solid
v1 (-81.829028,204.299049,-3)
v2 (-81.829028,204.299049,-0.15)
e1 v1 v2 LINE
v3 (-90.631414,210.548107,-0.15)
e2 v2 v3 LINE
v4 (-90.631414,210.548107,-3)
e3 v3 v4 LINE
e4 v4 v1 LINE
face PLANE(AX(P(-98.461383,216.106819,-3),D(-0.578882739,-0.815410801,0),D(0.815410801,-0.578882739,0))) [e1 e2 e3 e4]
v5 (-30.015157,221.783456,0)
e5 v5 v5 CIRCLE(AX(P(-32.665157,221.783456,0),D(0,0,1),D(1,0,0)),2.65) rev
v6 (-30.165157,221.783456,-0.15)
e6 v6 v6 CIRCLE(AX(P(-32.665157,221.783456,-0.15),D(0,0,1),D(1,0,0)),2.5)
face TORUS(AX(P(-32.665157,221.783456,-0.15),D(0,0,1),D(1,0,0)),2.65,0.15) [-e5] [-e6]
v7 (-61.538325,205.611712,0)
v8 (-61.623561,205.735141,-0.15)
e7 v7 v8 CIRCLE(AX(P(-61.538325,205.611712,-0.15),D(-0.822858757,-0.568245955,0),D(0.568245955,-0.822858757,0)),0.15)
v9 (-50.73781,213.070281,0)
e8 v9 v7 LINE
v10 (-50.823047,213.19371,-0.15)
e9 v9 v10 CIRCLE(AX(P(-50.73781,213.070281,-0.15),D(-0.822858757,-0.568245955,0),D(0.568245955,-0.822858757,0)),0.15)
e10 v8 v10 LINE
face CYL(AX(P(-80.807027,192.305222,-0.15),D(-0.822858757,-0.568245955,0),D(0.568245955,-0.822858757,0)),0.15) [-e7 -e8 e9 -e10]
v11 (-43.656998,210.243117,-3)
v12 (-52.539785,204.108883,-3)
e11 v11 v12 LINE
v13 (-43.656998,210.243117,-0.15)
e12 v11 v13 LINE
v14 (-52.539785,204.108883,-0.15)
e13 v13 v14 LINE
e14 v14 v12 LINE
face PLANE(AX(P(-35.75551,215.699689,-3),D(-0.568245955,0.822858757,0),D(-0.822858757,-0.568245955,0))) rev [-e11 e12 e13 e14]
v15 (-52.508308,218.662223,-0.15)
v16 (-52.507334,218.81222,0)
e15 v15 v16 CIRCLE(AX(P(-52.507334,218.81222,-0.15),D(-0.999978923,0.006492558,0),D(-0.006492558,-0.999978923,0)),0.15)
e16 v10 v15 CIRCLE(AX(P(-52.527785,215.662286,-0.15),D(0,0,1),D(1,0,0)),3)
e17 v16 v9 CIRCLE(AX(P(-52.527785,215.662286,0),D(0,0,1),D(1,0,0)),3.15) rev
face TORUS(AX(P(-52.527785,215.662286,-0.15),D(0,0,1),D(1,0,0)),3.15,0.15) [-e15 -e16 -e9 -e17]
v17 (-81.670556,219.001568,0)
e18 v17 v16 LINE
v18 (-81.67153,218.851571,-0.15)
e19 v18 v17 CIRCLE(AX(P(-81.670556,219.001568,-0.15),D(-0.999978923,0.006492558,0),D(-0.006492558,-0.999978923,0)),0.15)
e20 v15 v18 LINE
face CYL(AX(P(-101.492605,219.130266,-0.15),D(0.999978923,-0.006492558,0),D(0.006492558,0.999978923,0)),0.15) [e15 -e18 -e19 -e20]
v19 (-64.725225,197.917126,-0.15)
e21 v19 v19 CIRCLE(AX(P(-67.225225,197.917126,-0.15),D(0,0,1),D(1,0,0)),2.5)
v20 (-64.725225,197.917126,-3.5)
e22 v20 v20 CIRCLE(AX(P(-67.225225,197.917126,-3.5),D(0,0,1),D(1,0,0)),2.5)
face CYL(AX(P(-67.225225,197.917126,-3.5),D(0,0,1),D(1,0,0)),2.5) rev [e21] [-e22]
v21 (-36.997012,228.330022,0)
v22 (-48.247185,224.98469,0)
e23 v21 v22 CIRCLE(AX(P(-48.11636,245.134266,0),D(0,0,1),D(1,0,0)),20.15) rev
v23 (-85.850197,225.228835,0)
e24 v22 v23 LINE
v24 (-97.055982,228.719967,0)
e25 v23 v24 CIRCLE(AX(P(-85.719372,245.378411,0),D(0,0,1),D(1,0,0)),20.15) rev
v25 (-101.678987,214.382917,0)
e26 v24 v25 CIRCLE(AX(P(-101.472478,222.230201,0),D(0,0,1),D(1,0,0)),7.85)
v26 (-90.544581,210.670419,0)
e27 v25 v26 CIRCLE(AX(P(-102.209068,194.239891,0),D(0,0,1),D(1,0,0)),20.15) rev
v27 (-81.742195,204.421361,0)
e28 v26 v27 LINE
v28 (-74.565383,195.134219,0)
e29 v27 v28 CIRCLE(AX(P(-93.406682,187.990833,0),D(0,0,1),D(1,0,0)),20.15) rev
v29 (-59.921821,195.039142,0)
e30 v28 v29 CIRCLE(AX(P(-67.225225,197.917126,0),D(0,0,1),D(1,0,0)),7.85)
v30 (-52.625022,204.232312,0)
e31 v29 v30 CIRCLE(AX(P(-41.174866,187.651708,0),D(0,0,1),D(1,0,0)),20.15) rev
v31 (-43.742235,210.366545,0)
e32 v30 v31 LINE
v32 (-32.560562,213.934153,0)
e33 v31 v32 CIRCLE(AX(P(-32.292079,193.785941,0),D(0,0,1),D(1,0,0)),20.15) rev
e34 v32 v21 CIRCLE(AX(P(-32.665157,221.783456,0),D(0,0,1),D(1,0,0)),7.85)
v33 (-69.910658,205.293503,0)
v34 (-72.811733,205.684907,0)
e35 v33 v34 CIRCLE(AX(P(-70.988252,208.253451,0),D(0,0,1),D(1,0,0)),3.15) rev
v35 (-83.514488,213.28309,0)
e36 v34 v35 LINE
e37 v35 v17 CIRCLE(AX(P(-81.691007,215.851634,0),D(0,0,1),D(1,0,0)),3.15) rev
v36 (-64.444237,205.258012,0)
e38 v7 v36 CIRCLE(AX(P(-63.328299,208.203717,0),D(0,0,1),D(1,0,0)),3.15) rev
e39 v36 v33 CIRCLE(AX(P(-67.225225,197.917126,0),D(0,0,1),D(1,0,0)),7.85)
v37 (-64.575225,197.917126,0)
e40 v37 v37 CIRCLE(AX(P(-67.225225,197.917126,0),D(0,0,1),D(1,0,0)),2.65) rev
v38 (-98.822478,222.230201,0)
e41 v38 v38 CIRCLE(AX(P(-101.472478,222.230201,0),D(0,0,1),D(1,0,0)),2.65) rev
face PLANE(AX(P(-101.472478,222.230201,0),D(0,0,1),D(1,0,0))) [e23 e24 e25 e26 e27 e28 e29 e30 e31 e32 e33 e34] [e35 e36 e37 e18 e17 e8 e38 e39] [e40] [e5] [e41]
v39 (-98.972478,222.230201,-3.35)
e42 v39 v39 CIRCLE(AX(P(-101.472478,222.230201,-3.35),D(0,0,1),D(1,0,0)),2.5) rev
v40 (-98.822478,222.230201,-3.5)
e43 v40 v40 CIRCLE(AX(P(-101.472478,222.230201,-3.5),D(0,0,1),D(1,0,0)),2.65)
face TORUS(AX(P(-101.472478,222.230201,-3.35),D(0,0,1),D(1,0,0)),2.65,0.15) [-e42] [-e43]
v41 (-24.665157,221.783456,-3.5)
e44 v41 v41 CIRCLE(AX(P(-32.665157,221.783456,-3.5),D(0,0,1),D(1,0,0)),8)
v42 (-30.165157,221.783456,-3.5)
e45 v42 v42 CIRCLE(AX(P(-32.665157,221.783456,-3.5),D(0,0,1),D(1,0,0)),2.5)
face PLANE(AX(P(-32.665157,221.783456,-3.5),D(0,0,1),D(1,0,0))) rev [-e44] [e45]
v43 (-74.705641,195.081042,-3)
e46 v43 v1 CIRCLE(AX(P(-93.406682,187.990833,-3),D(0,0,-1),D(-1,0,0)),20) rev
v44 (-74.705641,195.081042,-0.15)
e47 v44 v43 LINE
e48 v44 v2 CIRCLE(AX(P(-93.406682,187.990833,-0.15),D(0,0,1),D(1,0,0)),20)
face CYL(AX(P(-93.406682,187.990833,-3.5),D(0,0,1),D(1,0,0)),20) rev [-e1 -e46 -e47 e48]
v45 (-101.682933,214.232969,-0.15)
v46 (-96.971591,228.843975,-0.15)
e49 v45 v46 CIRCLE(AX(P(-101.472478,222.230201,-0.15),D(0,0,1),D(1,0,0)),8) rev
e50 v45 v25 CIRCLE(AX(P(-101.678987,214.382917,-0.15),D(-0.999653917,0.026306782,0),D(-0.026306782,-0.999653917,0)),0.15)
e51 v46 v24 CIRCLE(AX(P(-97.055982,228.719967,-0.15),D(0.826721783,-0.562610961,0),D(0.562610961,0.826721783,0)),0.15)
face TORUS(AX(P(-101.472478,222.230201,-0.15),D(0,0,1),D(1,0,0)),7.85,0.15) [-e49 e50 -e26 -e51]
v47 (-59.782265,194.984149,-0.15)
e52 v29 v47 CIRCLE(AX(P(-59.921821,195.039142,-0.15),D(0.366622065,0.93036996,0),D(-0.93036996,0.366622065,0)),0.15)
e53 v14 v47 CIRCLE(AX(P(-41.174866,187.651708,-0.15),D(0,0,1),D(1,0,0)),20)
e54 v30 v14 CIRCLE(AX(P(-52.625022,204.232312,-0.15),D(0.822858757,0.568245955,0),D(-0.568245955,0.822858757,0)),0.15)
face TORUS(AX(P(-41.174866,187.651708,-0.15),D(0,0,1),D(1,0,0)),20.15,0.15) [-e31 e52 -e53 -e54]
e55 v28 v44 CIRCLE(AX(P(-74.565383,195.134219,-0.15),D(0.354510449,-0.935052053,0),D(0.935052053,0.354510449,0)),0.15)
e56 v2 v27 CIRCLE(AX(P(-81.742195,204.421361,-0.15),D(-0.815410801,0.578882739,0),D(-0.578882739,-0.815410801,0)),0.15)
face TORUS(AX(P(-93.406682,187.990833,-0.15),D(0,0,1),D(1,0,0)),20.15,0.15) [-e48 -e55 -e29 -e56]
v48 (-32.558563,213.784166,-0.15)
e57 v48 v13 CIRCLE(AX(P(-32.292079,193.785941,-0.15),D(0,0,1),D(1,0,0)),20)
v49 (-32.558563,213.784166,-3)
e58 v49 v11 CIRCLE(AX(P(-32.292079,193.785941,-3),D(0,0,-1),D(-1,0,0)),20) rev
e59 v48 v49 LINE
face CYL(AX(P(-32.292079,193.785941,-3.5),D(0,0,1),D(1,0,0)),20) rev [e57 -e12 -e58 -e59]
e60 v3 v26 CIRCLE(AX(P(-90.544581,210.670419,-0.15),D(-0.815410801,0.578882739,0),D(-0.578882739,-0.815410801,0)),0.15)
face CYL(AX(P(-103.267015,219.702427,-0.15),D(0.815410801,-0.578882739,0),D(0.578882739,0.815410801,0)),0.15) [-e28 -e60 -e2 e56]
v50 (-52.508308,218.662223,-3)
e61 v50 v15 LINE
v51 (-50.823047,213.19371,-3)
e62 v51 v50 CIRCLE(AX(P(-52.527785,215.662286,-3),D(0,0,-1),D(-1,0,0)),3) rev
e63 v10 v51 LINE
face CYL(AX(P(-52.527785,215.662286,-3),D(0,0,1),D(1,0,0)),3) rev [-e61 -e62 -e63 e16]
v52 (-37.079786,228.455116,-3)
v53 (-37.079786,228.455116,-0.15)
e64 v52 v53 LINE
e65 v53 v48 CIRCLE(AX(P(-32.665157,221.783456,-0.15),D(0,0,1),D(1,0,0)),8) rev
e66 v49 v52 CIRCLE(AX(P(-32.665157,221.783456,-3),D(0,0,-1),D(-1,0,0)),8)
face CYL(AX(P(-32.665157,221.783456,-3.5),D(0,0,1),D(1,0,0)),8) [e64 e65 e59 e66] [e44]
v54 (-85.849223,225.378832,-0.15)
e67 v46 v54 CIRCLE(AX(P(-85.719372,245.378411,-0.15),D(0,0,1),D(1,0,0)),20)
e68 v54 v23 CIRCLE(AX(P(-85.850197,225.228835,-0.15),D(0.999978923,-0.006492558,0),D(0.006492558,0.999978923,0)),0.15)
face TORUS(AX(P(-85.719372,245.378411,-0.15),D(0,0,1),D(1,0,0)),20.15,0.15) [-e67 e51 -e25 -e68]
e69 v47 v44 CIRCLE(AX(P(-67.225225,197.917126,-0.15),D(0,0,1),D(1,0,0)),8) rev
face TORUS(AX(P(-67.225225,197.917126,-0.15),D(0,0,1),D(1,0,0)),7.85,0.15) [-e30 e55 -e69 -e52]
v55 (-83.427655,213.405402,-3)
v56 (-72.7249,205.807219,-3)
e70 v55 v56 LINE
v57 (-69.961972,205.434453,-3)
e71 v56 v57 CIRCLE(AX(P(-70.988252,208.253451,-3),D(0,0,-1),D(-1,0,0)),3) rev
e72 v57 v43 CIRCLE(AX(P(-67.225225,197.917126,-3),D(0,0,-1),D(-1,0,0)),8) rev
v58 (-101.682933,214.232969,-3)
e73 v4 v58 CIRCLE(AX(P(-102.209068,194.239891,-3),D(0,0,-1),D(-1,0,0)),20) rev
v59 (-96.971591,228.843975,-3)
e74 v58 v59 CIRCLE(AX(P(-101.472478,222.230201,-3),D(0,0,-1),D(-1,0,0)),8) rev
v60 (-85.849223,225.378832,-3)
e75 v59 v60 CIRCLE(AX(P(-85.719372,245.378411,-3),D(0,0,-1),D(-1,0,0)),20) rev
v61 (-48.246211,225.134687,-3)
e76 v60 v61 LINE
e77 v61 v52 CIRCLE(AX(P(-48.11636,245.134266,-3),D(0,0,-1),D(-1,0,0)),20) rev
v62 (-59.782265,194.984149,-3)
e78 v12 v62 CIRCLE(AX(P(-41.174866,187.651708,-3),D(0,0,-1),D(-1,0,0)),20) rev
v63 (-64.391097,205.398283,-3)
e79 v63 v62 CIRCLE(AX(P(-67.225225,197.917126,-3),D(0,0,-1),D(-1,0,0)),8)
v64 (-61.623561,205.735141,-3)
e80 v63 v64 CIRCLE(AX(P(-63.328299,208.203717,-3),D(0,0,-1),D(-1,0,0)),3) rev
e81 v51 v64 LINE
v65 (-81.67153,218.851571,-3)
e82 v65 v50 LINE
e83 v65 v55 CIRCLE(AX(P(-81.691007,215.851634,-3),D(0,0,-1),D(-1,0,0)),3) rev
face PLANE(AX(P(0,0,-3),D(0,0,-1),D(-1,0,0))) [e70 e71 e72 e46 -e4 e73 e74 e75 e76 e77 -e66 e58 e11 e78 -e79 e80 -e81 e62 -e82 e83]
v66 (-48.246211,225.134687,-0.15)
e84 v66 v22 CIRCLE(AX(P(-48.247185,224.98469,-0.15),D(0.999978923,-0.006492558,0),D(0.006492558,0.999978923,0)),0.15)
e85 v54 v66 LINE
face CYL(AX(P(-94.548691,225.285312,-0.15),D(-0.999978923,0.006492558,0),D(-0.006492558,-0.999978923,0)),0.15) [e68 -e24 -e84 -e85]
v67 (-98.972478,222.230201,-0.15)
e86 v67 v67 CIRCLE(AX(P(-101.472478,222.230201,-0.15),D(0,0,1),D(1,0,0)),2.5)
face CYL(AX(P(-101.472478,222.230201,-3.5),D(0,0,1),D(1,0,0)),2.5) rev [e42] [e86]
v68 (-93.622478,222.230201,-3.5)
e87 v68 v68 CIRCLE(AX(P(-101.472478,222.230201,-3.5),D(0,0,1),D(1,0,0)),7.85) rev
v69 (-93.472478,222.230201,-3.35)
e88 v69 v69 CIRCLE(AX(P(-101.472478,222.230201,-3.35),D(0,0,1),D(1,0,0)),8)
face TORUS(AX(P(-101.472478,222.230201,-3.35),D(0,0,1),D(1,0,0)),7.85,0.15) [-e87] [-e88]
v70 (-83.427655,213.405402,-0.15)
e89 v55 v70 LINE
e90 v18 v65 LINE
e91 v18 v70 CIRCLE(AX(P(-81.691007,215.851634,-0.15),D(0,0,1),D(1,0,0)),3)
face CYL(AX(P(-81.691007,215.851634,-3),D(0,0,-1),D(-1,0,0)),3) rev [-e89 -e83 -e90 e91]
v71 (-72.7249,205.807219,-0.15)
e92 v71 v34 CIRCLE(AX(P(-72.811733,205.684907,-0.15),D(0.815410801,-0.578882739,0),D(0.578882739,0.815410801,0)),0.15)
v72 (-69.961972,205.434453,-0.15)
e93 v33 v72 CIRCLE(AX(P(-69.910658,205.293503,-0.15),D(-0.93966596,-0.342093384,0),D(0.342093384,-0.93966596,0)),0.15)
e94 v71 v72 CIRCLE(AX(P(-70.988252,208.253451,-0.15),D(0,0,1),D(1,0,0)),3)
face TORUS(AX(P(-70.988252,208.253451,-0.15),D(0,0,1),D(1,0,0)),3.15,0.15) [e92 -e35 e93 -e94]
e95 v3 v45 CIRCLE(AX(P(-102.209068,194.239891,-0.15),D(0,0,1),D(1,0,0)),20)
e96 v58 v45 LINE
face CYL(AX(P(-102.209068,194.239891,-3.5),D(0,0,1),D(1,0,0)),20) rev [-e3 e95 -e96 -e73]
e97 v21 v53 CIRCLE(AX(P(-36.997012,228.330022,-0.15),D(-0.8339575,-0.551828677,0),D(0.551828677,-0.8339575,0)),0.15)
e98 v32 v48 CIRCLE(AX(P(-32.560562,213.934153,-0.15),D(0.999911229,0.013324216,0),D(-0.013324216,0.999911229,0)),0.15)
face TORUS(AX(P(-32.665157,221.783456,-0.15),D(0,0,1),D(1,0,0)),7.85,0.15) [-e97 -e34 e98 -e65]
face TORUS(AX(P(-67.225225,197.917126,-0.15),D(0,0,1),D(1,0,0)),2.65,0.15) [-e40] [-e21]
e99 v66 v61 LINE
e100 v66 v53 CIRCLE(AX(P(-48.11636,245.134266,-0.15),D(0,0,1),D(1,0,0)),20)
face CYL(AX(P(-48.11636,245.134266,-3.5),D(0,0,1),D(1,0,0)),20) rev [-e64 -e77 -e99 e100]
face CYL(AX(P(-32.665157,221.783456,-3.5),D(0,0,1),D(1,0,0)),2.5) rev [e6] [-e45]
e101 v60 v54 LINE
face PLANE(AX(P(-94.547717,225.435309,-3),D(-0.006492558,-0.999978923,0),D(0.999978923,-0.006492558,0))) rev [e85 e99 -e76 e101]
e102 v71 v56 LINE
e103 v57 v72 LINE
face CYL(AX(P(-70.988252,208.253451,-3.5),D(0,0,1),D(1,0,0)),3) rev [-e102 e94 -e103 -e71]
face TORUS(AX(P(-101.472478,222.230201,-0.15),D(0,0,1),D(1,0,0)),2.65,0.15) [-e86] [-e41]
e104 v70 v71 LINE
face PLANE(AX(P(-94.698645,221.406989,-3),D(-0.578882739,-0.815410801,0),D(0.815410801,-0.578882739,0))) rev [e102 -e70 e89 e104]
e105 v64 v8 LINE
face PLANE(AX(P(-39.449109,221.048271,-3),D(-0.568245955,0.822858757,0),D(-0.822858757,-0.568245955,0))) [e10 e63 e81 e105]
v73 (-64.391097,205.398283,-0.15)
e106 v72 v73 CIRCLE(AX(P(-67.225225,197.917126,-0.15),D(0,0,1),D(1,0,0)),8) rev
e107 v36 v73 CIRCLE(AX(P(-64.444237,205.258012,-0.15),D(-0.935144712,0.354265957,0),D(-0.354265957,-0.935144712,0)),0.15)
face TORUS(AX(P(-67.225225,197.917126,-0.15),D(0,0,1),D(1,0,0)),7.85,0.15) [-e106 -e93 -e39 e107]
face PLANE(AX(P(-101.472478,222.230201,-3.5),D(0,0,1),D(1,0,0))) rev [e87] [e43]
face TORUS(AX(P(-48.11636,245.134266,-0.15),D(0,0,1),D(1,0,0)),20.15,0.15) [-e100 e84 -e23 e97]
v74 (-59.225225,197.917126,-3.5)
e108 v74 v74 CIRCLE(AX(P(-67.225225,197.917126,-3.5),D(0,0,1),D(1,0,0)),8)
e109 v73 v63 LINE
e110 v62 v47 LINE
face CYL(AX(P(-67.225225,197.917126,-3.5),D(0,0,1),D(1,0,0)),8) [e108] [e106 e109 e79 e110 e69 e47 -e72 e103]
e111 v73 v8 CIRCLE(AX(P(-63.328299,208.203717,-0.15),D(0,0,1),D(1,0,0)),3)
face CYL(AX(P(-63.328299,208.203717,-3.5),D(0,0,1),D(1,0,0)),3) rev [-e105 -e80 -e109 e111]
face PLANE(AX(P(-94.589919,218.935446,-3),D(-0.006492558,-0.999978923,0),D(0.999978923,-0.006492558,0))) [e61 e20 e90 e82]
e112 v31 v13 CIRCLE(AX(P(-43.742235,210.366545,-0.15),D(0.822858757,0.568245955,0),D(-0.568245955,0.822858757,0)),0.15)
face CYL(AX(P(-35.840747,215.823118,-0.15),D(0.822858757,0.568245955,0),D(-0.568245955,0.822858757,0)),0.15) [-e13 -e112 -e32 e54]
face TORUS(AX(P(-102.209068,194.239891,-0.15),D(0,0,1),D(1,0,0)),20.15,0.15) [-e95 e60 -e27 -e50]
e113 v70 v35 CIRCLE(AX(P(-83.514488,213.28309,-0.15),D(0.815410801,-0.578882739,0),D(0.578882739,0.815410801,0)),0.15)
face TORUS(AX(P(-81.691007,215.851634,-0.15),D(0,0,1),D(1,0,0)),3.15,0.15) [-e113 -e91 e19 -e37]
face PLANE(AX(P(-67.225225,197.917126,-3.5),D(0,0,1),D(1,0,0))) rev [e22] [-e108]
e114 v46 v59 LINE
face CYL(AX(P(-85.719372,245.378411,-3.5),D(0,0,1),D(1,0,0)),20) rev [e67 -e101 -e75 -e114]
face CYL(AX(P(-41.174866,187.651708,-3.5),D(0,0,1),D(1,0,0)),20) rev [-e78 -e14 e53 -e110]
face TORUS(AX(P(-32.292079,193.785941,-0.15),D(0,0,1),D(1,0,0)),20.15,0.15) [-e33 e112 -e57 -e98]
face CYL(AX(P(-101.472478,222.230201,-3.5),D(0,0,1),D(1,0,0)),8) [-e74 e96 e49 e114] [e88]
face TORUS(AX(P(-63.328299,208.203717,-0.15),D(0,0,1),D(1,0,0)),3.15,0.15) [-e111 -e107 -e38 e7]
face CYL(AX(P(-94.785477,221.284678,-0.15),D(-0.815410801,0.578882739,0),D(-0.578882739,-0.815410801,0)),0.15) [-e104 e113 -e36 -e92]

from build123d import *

# Parameters (mm, degrees)
SKETCH_1_R        = 8
SKETCH_1_R_2      = 2.5
EXTRUDE_1_DEPTH   = 3.5
EXTRUDE_1_2_DEPTH = 3.5
EXTRUDE_1_3_DEPTH = 3.5
EXTRUDE_1_4_DEPTH = 3
FILLET_1_R        = 3
FILLET_2_R        = 20
FILLET_3_R        = 0.15


with BuildPart() as part:
    # 草图1 → Extrude 1 (new body)
    with BuildSketch(Plane.XY):
        with Locations((-101.472478495, 222.230200701)):
            Circle(SKETCH_1_R)
        with Locations((-101.472478495, 222.230200701)):
            Circle(SKETCH_1_R_2, mode=Mode.SUBTRACT)
    extrude(amount=-EXTRUDE_1_DEPTH)



with BuildPart() as body_2:
    # 草图1 → Extrude 1 2 (new body)
    with BuildSketch(Plane.XY):
        with Locations((-32.665157049, 221.783455762)):
            Circle(SKETCH_1_R)
        with Locations((-32.665157049, 221.783455762)):
            Circle(SKETCH_1_R_2, mode=Mode.SUBTRACT)
    extrude(amount=-EXTRUDE_1_2_DEPTH)


with BuildPart() as body_3:
    # 草图1 → Extrude 1 3 (new body)
    with BuildSketch(Plane.XY):
        with Locations((-67.225224859, 197.917125651)):
            Circle(SKETCH_1_R)
        with Locations((-67.225224859, 197.917125651)):
            Circle(SKETCH_1_R_2, mode=Mode.SUBTRACT)
    extrude(amount=-EXTRUDE_1_3_DEPTH)


with BuildPart() as part_1:
    add(part.part)

    add(body_2.part)  # Extrude 1 4 merges body 2

    add(body_3.part)  # Extrude 1 4 merges body 3
    # 草图2 → Extrude 1 4 (add)
    with BuildSketch(Plane.XY):
        Polygon((-94.589918585, 218.935445838), (-39.589918585, 218.578347624), (-39.547716959, 225.078210624), (-94.547716959, 225.435308839), align=None)
        Polygon((-39.449108947, 221.048270993), (-64.134871668, 204.000892343), (-60.441272961, 198.65231042), (-35.755510239, 215.69968907), align=None)
        Polygon((-98.461382592, 216.106819162), (-73.999058567, 198.740336984), (-70.236320761, 204.040507189), (-94.698644787, 221.406989368), align=None)
    extrude(amount=-EXTRUDE_1_4_DEPTH)

    # 圆角1
    fillet_1_edges = [part_1.edges().sort_by_distance(p)[0] for p in [
        (-42.993723716, 218.600447492, -1.5),
        (-63.0568479, 204.745348958, -1.5),
        (-71.304586993, 204.798899011, -1.5),
        (-91.186113454, 218.91334597, -1.5),
    ]]
    fillet(fillet_1_edges, radius=FILLET_1_R)

    # 圆角2
    # the kernel refuses this fillet: 20 mm, written as the material it adds along each edge
    with BuildSketch(Plane(origin=(-94.141435997, 225.43267098, -3), x_dir=(-0.638505436471582, 0.7696173124327664, 0), z_dir=(0, 0, 1)), Plane(origin=(-36.833534007, 214.955232455, -3), x_dir=(0.9644673889945874, -0.26420192195736086, 0), z_dir=(0, 0, 1))) as fillet_2_piece_1:
        with BuildLine():
            CenterArc((9.973052641, -19.217229771), FILLET_2_R, 106.082980193, 33.864557297)
            Line((-5.336058514, -6.347454495), (0, 0))
            ThreePointArc((0, 0), (2.21623392, -0.313108092), (4.43246784, 0))
        make_face()
    extrude(amount=3)
    with BuildSketch(Plane(origin=(-39.95399792, 225.080848483, -3), x_dir=(-0.9999789231234605, 0.00649255795851874, 0), z_dir=(0, 0, 1)), Plane(origin=(-59.363249193, 199.396767035, -3), x_dir=(0.8228587573791318, 0.5682459550269326, 0), z_dir=(0, 0, 1)), Plane(origin=(-97.393116361, 215.348427341, -3), x_dir=(0.8154108008658386, -0.5788827392756946, 0), z_dir=(0, 0, 1))) as fillet_2_piece_2:
        with BuildLine():
            CenterArc((8.292388018, -20), FILLET_2_R, 90, 33.864557297)
            ThreePointArc((-2.852243251, -3.392857143), (-1.186451297, -1.89791011), (0, 0))
            Line((0, 0), (8.292388018, 0))
        make_face()
    extrude(amount=3)
    with BuildSketch(Plane(origin=(-75.067324798, 199.498728805, -3), x_dir=(-0.8154108008658375, 0.578882739275696, 0), z_dir=(0, 0, 1))) as fillet_2_piece_3:
        with BuildLine():
            CenterArc((8.292388018, 20), FILLET_2_R, 236.135442703, 33.864557297)
            ThreePointArc((-2.852243251, 3.392857143), (-1.186451297, 1.89791011), (0, 0))
            Line((0, 0), (8.292388018, 0))
        make_face()
    extrude(amount=3)

    # 圆角3
    fillet_3_edges = [part_1.edges().sort_by_distance(p)[0] for p in [
        (-67.089918585, 218.756896731, 0),
        (-78.076277889, 209.60631016, 0),
        (-56.223304427, 209.464425473, 0),
        (-67.173284395, 205.916957036, 0),
        (-84.546240762, 216.772308484, 0),
        (-49.660837657, 216.545808209, 0),
        (-62.965821684, 205.225696331, 0),
        (-71.3893683, 205.280387848, 0),
        (-67.047716959, 225.256759732, 0),
        (-28.878142084, 228.830335757, 0),
        (-109.086434491, 224.685332894, 0),
        (-86.23022058, 207.423578073, 0),
        (-67.277165322, 189.917294266, 0),
        (-48.0983916, 207.175999745, 0),
        (-42.415881112, 225.963857819, 0),
        (-91.668294621, 226.283638708, 0),
        (-95.882933059, 213.21303025, 0),
        (-77.581298649, 200.220192469, 0),
        (-56.840119194, 200.085526321, 0),
        (-38.371317785, 212.839624884, 0),
        (-35.165157049, 221.783455762, 0),
        (-109.472478495, 222.230200701, -3.5),
        (-103.972478495, 222.230200701, -3.5),
        (-103.972478495, 222.230200701, 0),
        (-69.725224859, 197.917125651, 0),
    ]]
    fillet(fillet_3_edges, radius=FILLET_3_R)


solid = part_1.part
